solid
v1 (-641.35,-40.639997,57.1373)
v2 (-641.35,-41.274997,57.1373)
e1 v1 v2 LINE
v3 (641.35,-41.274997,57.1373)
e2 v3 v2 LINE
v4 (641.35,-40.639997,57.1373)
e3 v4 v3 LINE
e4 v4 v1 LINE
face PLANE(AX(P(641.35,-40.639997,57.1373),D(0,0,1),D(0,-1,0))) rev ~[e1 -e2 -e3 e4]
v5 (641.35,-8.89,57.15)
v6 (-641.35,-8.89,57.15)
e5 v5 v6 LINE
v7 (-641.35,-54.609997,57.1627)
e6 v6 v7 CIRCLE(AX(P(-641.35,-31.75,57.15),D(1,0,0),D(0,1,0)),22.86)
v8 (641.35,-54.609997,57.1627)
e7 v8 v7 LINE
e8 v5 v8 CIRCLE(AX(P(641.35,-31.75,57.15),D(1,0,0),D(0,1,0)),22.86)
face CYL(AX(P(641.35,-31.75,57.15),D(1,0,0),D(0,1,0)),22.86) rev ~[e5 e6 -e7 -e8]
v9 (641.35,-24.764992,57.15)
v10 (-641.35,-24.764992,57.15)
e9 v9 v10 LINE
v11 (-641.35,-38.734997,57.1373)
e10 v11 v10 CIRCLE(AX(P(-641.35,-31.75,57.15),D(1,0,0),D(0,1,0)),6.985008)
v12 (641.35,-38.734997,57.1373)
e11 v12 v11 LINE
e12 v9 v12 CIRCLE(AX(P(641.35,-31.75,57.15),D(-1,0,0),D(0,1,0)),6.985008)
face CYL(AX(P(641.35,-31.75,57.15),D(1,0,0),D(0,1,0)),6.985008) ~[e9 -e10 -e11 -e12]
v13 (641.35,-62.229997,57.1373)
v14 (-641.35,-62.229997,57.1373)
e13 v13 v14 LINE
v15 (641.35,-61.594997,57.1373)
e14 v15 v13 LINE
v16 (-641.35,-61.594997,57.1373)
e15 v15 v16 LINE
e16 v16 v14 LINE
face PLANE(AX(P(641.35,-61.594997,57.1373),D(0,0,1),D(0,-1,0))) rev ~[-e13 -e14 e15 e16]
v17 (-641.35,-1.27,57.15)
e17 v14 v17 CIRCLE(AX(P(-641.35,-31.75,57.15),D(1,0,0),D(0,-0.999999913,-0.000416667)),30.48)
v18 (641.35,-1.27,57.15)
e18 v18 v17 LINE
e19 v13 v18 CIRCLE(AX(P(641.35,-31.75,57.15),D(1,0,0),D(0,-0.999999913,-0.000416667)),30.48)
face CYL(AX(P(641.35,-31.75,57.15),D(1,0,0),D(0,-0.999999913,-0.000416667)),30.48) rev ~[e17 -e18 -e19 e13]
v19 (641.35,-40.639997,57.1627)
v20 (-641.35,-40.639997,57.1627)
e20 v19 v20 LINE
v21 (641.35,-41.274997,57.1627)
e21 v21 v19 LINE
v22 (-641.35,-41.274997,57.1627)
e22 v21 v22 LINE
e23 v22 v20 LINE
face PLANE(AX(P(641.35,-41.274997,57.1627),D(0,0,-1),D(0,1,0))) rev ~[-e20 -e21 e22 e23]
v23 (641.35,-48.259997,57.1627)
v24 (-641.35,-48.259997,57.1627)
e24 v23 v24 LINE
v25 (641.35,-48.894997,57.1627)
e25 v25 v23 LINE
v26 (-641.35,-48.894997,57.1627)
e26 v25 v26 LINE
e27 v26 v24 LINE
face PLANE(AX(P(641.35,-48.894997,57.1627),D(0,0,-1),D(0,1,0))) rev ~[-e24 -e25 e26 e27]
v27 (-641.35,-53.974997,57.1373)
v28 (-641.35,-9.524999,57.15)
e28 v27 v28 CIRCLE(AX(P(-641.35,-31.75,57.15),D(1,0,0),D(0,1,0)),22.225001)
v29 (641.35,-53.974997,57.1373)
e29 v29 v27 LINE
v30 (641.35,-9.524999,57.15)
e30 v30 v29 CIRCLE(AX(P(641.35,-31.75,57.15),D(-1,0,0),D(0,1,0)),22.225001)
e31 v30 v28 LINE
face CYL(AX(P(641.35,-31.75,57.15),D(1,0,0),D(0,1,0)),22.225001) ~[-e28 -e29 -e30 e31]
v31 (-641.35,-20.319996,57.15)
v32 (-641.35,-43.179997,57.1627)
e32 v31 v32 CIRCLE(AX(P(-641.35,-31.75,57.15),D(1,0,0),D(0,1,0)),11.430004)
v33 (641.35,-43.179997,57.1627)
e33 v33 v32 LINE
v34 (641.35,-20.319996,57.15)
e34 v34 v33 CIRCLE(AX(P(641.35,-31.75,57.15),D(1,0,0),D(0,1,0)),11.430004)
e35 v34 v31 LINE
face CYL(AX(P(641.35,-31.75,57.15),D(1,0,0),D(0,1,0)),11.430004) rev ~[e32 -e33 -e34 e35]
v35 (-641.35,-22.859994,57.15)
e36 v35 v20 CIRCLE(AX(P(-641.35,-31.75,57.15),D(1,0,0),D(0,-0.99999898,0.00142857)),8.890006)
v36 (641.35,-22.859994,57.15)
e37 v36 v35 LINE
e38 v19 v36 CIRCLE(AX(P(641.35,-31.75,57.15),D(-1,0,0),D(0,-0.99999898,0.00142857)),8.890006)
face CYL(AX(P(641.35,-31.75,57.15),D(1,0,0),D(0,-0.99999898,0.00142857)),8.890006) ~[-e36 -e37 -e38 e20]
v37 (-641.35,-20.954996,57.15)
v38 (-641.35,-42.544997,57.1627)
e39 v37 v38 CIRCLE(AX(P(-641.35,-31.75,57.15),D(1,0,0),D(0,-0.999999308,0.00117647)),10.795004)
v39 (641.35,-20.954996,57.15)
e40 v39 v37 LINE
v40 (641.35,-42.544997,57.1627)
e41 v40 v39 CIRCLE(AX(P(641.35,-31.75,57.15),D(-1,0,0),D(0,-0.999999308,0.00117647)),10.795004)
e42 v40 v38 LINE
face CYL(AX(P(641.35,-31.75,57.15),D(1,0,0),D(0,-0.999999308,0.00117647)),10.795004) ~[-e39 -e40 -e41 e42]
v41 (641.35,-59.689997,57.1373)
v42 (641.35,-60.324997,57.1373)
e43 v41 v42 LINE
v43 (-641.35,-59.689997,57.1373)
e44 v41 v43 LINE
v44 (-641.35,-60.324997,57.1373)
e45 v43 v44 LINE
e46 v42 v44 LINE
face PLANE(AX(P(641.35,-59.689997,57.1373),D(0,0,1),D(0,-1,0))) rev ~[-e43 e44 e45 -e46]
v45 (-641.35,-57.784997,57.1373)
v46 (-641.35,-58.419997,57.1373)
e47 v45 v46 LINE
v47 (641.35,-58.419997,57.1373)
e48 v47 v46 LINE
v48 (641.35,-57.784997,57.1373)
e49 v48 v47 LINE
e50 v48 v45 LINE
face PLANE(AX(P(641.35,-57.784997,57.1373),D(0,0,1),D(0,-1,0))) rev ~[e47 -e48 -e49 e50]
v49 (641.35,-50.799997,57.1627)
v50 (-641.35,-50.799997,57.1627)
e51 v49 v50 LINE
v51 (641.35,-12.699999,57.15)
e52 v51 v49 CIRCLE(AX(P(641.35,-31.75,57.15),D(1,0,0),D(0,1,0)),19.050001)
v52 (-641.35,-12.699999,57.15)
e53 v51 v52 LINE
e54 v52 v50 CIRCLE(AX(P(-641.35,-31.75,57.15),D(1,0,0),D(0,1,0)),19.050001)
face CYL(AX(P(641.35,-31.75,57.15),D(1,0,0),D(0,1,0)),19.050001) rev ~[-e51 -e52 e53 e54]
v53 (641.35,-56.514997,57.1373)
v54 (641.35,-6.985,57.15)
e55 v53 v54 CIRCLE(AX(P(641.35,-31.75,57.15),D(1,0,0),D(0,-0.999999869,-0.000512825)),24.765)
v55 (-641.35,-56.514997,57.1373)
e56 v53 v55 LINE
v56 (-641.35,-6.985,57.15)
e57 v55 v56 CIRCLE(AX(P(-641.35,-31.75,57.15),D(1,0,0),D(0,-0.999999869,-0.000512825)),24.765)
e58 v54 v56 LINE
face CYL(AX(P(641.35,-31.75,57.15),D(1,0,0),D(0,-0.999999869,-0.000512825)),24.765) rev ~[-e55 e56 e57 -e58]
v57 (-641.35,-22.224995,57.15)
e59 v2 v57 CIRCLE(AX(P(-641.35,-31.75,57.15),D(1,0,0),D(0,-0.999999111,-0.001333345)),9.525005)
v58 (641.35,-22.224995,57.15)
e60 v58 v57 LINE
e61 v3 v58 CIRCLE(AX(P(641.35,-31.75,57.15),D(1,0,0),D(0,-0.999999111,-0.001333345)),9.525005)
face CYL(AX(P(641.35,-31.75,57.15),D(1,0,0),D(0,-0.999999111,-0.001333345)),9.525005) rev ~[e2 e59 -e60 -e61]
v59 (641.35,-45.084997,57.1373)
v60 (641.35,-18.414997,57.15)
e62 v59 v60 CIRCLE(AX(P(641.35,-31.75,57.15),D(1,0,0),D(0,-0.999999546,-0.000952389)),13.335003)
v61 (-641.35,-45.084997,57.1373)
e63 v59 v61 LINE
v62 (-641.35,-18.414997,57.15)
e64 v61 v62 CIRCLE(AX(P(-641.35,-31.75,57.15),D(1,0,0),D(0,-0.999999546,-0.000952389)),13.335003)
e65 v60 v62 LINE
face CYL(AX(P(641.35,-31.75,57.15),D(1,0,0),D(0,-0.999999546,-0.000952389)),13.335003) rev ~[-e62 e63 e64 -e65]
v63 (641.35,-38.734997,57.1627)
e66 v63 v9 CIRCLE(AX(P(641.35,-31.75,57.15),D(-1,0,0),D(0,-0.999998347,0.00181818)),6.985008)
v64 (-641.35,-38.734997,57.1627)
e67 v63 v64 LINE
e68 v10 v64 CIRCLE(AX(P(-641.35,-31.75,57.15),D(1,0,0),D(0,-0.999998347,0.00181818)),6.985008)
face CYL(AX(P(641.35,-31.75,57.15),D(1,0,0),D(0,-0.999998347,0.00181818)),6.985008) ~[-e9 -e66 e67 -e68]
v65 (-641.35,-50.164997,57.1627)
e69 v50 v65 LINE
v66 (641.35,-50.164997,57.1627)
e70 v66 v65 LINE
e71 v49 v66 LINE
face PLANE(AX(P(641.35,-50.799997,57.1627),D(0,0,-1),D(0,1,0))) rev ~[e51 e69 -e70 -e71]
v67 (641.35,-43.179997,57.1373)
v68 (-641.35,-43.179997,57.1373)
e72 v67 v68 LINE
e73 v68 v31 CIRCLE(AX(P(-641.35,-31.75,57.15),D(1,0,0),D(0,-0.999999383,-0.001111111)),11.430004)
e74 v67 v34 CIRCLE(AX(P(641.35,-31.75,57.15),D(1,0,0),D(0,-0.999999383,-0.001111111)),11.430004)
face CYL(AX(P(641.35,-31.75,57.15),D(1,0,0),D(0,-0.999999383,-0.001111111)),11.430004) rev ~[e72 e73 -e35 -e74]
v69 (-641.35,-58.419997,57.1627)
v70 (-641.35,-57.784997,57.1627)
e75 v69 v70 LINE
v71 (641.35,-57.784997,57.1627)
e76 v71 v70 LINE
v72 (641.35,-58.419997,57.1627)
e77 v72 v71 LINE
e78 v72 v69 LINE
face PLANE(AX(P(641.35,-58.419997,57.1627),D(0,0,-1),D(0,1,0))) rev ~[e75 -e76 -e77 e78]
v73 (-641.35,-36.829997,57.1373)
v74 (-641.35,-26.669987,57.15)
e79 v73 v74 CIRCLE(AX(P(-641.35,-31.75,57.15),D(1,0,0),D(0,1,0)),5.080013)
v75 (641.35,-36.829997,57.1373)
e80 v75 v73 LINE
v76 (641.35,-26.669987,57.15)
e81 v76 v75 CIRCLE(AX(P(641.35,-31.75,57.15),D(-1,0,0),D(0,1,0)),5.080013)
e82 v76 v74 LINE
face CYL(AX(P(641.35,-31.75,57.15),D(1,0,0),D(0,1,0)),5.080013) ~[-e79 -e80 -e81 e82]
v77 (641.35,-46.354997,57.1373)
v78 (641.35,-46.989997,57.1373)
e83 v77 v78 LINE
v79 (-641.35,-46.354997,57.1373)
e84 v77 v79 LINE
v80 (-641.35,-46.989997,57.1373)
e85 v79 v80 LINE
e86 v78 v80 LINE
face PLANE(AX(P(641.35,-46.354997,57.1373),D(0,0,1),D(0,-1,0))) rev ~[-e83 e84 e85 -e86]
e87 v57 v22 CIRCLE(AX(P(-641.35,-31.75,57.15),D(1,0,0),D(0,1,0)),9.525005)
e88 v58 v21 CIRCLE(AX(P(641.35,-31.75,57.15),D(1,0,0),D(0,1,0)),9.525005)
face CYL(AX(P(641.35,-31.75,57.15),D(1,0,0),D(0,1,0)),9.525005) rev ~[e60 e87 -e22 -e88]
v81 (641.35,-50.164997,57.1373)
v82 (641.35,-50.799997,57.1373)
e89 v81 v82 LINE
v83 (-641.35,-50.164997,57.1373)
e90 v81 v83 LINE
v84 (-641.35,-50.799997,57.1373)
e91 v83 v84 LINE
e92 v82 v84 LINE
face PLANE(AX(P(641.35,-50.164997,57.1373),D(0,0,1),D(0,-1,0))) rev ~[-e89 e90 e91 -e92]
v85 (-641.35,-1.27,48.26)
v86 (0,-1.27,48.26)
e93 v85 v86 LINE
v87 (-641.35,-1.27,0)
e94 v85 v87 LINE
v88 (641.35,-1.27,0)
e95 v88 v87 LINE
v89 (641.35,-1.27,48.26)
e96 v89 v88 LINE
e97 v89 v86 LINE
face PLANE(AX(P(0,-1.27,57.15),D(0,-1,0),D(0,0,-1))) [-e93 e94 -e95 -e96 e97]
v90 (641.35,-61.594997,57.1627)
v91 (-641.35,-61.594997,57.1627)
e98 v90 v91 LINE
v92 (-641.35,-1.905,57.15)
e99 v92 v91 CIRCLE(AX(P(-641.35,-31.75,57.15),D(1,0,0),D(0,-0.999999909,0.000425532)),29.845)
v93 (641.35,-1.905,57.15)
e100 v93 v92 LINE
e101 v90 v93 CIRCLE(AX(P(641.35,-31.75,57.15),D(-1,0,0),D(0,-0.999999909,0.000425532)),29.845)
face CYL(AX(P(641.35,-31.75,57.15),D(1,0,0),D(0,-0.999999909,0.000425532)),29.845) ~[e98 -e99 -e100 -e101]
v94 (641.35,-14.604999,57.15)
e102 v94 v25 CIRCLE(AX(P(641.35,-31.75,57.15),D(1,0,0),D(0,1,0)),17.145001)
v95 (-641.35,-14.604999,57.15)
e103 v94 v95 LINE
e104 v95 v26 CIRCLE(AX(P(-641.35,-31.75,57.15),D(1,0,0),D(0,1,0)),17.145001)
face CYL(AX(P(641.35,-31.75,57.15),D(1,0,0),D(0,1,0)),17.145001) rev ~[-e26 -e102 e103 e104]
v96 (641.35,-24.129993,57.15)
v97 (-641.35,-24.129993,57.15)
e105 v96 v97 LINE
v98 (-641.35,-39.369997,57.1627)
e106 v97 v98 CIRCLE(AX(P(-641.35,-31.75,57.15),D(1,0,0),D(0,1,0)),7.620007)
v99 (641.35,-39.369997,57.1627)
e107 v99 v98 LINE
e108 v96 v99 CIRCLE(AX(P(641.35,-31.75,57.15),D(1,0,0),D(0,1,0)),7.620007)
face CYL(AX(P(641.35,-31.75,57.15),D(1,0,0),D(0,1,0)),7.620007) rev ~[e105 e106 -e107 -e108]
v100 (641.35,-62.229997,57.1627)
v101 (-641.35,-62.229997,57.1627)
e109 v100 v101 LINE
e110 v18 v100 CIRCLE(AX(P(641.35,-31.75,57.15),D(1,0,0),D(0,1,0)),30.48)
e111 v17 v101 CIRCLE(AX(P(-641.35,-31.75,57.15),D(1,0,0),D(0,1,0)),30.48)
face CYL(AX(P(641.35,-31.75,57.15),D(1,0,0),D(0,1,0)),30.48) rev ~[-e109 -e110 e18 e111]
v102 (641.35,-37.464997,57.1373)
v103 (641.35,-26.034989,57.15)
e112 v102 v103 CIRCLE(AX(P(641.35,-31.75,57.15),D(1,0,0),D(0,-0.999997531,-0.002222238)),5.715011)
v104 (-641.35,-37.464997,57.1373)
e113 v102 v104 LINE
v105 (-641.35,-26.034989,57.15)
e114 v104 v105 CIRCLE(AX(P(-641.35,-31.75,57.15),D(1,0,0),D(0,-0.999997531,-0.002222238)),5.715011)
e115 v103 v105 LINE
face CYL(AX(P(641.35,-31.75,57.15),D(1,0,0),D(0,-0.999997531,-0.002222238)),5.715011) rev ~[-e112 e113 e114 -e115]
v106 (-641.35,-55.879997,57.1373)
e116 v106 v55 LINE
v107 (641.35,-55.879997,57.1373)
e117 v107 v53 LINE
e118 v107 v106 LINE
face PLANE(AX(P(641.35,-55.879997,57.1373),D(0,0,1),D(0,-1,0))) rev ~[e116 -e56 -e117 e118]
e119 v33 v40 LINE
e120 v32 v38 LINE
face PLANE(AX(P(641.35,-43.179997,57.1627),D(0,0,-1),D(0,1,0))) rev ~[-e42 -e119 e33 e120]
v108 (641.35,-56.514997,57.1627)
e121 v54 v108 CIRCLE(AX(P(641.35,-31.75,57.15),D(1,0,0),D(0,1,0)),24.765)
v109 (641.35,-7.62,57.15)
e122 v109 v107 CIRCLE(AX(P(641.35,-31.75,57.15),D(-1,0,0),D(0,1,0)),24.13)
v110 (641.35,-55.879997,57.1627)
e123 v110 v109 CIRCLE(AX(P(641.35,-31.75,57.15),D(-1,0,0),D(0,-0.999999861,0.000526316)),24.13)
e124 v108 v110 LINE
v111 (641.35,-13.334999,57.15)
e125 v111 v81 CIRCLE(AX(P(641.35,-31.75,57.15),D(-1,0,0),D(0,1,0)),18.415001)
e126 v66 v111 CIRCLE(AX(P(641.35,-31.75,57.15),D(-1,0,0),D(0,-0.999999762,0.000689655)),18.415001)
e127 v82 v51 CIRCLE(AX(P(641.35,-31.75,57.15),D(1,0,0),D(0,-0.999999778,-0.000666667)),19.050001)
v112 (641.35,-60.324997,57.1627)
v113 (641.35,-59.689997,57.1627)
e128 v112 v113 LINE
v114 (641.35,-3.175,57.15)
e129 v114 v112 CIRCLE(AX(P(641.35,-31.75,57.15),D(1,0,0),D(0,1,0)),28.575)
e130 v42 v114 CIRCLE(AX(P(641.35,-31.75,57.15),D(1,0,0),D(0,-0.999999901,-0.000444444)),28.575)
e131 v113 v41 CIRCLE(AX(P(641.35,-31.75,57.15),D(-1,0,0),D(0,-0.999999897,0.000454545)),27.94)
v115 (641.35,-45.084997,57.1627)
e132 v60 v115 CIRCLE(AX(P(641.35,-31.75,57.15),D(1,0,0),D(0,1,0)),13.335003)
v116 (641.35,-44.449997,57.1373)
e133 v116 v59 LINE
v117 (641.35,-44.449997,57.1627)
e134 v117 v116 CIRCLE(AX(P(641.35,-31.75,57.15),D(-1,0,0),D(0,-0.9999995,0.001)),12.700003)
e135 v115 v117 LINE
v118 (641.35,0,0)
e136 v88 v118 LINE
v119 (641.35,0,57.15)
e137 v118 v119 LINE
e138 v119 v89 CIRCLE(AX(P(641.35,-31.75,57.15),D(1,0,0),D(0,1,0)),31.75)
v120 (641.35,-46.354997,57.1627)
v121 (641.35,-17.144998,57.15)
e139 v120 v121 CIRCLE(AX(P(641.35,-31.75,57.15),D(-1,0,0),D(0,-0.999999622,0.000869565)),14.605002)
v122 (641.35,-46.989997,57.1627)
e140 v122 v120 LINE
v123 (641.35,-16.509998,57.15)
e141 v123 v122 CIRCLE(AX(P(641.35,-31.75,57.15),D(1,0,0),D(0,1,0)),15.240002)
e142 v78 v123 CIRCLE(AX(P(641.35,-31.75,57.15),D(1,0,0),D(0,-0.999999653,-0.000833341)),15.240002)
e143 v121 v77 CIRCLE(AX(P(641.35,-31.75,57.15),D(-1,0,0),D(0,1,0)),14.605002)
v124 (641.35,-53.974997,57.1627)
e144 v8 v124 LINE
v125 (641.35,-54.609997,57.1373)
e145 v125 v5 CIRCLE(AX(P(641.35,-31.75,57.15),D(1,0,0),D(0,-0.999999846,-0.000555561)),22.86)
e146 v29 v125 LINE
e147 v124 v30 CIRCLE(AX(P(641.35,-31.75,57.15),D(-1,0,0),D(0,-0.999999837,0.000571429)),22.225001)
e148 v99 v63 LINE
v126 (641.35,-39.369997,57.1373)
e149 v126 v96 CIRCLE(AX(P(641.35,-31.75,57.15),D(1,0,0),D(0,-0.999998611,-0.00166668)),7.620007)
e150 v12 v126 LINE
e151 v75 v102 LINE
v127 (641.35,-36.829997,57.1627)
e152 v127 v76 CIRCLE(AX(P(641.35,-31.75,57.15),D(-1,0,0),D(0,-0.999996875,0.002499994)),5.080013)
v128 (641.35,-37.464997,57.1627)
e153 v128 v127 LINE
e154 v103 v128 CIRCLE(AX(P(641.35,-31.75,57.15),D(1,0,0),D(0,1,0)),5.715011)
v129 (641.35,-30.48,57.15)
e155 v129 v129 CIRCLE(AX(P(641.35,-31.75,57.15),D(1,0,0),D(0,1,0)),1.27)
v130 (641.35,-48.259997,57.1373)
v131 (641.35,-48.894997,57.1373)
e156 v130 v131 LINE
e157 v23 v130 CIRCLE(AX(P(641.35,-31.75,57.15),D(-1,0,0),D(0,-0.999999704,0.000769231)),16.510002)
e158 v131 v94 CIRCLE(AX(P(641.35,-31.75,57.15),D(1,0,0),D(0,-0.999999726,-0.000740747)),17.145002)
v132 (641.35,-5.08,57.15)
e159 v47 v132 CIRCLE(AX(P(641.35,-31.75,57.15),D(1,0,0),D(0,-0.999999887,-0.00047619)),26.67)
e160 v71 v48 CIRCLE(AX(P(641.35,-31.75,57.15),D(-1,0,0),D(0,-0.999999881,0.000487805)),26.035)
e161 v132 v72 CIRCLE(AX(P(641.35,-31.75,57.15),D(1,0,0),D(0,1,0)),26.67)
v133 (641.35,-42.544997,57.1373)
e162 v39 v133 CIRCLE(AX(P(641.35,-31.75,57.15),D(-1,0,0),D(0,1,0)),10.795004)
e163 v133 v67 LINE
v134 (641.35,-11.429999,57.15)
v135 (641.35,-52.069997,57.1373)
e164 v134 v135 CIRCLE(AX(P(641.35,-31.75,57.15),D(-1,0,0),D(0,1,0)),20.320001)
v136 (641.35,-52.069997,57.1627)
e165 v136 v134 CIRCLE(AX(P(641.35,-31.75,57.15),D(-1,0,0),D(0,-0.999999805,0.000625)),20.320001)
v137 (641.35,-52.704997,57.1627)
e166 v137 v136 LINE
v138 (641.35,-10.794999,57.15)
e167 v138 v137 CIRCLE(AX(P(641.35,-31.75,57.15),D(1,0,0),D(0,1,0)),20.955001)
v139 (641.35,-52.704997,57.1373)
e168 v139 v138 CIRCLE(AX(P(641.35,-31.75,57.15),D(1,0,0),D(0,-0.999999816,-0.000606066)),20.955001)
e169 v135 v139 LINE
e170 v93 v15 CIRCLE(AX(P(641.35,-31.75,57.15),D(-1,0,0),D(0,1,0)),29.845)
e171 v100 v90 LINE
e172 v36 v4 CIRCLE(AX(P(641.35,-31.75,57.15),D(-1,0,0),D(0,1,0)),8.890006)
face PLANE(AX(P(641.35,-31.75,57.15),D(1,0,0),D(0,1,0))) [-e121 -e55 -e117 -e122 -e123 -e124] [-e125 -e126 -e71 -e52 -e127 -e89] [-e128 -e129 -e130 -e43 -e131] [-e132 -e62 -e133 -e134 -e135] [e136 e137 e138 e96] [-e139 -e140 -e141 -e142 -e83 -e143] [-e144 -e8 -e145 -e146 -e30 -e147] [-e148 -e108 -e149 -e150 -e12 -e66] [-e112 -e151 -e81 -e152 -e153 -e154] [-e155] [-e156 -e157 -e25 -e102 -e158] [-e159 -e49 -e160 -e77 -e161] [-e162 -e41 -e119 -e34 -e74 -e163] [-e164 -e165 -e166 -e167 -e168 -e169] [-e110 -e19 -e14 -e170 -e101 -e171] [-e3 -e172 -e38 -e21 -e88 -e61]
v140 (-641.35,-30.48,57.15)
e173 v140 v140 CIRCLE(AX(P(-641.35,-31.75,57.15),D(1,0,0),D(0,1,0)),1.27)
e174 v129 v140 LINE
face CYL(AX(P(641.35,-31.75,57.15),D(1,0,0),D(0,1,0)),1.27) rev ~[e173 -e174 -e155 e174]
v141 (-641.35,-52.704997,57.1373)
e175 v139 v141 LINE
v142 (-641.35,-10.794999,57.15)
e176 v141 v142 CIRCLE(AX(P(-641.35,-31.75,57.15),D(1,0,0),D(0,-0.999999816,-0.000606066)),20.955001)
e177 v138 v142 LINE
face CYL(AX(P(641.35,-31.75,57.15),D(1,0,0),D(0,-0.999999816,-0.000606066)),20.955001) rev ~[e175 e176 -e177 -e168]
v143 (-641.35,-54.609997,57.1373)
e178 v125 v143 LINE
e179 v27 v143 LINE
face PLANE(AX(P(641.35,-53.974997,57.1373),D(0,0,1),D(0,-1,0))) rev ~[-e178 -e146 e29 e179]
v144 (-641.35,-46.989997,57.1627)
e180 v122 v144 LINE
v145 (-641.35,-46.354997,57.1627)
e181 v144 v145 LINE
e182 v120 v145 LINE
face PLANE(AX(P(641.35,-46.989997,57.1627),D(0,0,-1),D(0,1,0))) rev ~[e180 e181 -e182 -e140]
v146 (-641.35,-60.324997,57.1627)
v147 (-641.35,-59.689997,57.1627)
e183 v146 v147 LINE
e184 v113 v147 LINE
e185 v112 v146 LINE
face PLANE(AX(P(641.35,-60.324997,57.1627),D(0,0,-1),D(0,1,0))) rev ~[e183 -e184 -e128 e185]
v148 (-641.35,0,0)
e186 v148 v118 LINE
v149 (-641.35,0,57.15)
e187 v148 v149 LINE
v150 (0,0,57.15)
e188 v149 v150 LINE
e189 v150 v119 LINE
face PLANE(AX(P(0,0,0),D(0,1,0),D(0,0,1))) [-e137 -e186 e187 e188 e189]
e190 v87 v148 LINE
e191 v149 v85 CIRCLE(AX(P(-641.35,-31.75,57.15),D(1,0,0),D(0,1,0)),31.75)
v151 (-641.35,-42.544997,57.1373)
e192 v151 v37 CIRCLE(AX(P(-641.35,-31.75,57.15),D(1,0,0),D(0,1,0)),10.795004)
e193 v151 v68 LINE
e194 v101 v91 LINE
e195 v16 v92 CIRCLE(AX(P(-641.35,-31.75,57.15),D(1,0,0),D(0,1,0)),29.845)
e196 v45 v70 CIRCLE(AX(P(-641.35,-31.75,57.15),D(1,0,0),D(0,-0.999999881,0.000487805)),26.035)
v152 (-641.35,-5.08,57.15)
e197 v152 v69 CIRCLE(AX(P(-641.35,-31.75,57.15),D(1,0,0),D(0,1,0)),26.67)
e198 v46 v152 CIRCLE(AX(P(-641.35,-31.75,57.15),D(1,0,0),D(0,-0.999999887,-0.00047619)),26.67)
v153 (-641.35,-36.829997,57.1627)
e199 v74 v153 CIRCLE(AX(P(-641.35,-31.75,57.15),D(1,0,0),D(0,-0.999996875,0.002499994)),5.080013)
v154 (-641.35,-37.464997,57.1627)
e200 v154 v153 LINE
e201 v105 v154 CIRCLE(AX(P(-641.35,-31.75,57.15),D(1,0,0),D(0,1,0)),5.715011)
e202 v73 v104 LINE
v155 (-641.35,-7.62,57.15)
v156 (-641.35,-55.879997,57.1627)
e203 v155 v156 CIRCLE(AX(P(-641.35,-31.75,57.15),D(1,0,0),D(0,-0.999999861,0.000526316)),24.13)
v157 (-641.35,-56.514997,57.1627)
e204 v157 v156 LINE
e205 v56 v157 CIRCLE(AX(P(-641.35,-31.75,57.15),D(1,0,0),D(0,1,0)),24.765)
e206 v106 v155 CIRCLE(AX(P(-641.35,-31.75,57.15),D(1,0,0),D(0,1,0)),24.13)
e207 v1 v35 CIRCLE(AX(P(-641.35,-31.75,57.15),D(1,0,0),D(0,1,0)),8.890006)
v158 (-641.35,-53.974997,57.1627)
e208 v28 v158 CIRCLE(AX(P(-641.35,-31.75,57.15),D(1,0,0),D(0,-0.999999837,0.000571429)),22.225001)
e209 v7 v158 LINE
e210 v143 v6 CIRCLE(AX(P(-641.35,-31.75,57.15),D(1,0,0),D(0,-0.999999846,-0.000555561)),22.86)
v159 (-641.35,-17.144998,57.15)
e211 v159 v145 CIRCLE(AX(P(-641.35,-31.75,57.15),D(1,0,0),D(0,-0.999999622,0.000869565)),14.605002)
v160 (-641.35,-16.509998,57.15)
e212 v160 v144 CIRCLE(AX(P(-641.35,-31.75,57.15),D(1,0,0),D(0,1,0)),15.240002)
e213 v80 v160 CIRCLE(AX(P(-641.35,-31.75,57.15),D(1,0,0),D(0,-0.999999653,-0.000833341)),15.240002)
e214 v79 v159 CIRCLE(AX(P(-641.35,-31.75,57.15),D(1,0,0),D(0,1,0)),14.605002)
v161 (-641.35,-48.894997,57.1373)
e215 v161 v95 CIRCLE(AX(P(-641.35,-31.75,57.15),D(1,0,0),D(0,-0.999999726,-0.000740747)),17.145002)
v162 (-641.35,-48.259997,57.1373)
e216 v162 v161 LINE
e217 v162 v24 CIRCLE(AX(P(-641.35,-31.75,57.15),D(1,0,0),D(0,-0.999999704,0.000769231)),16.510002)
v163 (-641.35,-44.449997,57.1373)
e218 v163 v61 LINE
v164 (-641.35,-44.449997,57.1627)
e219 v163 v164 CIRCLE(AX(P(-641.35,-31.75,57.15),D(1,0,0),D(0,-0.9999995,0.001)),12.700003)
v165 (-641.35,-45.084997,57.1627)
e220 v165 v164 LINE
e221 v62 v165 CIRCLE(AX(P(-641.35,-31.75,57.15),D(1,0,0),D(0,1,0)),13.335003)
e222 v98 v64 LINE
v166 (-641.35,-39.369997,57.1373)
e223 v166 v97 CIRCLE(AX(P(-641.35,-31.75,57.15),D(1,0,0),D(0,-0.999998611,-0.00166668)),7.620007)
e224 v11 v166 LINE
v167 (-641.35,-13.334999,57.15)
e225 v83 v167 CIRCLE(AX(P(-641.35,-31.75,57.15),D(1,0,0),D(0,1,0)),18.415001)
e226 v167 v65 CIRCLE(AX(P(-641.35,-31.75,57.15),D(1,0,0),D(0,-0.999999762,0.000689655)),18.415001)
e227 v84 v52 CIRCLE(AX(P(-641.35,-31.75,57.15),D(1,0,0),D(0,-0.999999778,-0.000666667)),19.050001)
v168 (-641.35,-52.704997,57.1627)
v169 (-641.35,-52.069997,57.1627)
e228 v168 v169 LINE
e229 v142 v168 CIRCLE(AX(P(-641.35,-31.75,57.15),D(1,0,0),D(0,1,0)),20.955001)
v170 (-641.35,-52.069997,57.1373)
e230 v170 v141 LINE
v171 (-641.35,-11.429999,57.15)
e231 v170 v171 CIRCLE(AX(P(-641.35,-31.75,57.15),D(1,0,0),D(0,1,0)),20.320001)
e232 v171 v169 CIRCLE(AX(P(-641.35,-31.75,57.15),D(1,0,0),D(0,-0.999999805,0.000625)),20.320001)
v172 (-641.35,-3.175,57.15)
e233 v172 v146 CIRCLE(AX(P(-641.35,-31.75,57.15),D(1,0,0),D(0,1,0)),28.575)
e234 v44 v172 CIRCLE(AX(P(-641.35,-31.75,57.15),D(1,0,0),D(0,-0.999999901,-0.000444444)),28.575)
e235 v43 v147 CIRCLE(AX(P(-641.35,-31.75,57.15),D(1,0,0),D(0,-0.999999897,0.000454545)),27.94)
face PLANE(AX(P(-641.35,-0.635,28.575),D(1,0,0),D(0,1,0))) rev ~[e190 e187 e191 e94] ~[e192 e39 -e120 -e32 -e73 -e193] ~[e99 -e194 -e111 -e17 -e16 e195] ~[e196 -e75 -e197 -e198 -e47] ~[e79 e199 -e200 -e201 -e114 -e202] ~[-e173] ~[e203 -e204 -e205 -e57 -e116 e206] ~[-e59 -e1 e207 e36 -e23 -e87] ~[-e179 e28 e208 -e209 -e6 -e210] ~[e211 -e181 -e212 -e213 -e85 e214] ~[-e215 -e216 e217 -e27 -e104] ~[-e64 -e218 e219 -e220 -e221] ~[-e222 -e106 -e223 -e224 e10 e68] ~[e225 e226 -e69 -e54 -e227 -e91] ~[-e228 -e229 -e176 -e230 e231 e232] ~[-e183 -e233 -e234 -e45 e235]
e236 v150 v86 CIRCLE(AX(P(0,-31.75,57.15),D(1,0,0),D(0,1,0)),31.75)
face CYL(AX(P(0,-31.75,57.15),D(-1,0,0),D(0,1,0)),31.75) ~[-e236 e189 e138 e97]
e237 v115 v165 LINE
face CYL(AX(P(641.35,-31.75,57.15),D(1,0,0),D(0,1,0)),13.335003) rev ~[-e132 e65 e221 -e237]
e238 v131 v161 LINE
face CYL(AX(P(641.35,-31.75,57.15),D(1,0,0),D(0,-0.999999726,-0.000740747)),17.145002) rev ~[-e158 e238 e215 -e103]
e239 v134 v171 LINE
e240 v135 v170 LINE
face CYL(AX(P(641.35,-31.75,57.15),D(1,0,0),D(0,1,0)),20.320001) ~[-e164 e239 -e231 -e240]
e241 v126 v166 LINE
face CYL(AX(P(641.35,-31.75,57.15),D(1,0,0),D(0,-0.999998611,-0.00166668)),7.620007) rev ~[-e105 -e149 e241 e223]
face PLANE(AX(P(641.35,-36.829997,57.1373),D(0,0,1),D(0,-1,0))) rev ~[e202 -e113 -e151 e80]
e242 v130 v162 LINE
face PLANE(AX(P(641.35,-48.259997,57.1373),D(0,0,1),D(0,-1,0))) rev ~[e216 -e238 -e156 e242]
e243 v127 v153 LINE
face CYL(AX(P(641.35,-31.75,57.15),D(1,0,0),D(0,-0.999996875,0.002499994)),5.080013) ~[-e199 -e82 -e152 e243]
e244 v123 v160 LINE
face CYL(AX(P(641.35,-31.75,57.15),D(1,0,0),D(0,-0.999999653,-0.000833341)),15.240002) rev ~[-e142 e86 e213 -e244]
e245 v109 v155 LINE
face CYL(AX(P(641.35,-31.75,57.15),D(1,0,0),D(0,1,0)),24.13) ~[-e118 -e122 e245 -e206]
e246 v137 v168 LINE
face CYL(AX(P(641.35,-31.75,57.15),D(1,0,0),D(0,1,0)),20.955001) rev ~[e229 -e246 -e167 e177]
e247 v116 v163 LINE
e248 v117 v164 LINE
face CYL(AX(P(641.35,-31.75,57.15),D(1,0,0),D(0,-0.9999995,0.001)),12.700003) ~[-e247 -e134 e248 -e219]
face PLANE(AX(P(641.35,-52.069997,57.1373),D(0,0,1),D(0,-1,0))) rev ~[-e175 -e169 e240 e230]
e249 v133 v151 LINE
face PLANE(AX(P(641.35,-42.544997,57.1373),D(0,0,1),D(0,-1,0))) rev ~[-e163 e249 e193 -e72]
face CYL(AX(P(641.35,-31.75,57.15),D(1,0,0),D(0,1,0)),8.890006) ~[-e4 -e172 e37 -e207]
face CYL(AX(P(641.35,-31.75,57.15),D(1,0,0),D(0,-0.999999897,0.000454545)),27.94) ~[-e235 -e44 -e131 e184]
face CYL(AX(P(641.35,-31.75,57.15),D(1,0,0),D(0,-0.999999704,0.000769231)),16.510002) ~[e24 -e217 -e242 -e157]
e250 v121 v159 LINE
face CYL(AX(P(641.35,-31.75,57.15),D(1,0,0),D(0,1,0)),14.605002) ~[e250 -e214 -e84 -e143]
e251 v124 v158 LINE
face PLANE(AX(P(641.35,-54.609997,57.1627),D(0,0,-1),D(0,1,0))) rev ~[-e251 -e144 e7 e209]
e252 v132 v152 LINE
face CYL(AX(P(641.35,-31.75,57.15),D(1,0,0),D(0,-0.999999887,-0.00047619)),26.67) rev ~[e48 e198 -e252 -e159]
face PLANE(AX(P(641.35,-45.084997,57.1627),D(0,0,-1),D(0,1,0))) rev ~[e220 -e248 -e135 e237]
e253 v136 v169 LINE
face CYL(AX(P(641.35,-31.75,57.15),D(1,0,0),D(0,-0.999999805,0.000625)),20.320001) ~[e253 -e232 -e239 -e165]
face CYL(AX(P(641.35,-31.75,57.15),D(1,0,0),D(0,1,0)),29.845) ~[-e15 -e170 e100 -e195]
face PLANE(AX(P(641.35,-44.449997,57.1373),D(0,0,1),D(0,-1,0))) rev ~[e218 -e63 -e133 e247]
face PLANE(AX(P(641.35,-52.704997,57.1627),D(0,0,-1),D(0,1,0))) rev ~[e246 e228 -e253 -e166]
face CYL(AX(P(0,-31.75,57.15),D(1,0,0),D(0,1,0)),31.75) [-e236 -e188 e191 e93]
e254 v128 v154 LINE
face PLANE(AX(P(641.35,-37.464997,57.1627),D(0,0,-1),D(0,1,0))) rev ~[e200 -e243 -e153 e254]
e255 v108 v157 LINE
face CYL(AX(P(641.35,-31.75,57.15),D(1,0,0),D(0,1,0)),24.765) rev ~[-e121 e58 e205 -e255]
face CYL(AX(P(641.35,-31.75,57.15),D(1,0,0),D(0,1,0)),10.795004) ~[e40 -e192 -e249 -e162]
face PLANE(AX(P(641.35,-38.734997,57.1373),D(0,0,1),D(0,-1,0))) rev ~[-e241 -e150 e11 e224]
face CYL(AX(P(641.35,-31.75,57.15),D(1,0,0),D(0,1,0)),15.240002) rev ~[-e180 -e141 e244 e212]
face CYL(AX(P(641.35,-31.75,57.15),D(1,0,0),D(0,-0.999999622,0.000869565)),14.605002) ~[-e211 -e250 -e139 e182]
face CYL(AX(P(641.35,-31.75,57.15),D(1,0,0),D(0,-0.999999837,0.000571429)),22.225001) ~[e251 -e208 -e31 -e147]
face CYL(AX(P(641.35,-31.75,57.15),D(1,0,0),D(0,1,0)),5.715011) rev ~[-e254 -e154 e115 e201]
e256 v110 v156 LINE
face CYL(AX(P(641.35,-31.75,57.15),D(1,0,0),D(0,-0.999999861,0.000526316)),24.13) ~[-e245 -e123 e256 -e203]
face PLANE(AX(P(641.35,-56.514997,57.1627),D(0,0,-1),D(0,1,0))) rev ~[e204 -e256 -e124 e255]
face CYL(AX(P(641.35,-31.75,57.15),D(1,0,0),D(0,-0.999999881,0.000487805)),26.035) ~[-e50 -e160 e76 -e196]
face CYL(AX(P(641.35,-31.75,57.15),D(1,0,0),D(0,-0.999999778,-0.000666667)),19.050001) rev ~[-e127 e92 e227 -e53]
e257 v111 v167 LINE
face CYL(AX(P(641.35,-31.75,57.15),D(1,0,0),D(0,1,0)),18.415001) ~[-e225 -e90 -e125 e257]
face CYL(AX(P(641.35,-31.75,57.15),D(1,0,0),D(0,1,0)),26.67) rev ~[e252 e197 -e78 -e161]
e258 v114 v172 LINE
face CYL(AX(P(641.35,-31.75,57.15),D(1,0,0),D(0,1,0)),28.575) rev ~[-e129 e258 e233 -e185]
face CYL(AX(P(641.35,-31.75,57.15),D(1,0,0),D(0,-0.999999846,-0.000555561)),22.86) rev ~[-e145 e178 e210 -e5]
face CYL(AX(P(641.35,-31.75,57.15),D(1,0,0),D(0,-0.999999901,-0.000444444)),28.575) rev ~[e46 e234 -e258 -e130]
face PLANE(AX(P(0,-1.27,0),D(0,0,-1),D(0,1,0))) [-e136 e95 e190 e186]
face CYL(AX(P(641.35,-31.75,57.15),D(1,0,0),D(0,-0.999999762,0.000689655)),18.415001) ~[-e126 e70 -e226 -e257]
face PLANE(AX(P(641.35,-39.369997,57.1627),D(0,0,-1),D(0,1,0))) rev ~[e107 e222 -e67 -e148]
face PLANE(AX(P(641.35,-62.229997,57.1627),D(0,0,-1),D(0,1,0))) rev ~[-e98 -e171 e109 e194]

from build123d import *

# Parameters (mm, degrees)
F1_DEPTH      = 641.35
F2_R          = 31.75
F3_DEPTH      = 641.35
F3_DEPTH_BACK = 641.35
F4_R          = 1.27
F5_DEPTH      = 1282.701


# Not quite as in the source:
# - ends of sketch curves that miss each other by under 0.0002 mm in the source are joined


with BuildPart() as f1:
    # F0 (on Right) → F1 (new body, symmetric)
    with BuildSketch(Plane.YZ):
        Polygon((-1.27, 0), (0, 0), (0, 57.15), (-1.27, 57.15), (-1.27, 52.07), align=None)
    extrude(amount=F1_DEPTH, both=True)

    # F2 (on Right) → F3 (join, two sides)
    with BuildSketch(Plane.YZ) as f3_sk:
        with Locations((-31.75, 57.15)):
            Circle(F2_R)
    extrude(amount=F3_DEPTH)
    extrude(f3_sk.sketch, amount=-F3_DEPTH_BACK)

    # F4 (on face) → F5 (cut, through all)
    with BuildSketch(Plane.YZ.offset(641.35)):
        with BuildLine():
            ThreePointArc((-62.2299973542, 57.1373), (-31.7436499999, 26.6700006615), (-1.27, 57.15))
            ThreePointArc((-1.27, 57.15), (-31.7436499999, 87.6299993385), (-62.2299973542, 57.1627))
            Line((-62.2299973542, 57.1627), (-61.5949972979, 57.1627))
            ThreePointArc((-61.5949972979, 57.1627), (-31.7436499999, 86.9949993245), (-1.905, 57.15))
            ThreePointArc((-1.905, 57.15), (-31.7436499999, 27.3050006755), (-61.5949972979, 57.1373))
            Line((-61.5949972979, 57.1373), (-62.2299973542, 57.1373))
        make_face()
        with BuildLine():
            ThreePointArc((-3.175, 57.15), (-31.7436499998, 85.7249992944), (-60.3249971778, 57.1627))
            Line((-60.3249971778, 57.1627), (-59.6899971136, 57.1627))
            ThreePointArc((-59.6899971136, 57.1627), (-31.7436499998, 85.0899992784), (-3.81, 57.15))
            ThreePointArc((-3.81, 57.15), (-31.7436499998, 29.2100007216), (-59.6899971136, 57.1373))
            Line((-59.6899971136, 57.1373), (-60.3249971778, 57.1373))
            ThreePointArc((-60.3249971778, 57.1373), (-31.7436499998, 28.5750007056), (-3.175, 57.15))
        make_face()
        with BuildLine():
            ThreePointArc((-5.08, 57.15), (-31.7436499998, 83.819999244), (-58.4199969762, 57.1627))
            Line((-58.4199969762, 57.1627), (-57.7849969024, 57.1627))
            ThreePointArc((-57.7849969024, 57.1627), (-31.7436499998, 83.1849992256), (-5.715, 57.15))
            ThreePointArc((-5.715, 57.15), (-31.7436499998, 31.1150007744), (-57.7849969024, 57.1373))
            Line((-57.7849969024, 57.1373), (-58.4199969762, 57.1373))
            ThreePointArc((-58.4199969762, 57.1373), (-31.7436499998, 30.480000756), (-5.08, 57.15))
        make_face()
        with BuildLine():
            ThreePointArc((-6.985, 57.15), (-31.7436499998, 81.9149991859), (-56.5149967436, 57.1626999999))
            Line((-56.5149967436, 57.1626999999), (-55.8799969024, 57.1627))
            ThreePointArc((-55.8799969024, 57.1627), (-31.7436499998, 81.279999409), (-7.6199997555, 57.15))
            ThreePointArc((-7.6199997555, 57.15), (-31.7436499998, 33.020000591), (-55.8799969024, 57.1373))
            Line((-55.8799969024, 57.1373), (-56.5149969762, 57.1373))
            ThreePointArc((-56.5149969762, 57.1373), (-31.7436499998, 32.3850008141), (-6.985, 57.15))
        make_face()
        with BuildLine():
            ThreePointArc((-8.8899997286, 57.15), (-31.7436499998, 80.0099993894), (-54.6099967436, 57.1626999999))
            Line((-54.6099967436, 57.1626999999), (-53.9749969024, 57.1627))
            ThreePointArc((-53.9749969024, 57.1627), (-31.7436499997, 79.3749996239), (-9.524999469, 57.15))
            ThreePointArc((-9.524999469, 57.15), (-31.7436499997, 34.9250003761), (-53.9749969024, 57.1373))
            Line((-53.9749969024, 57.1373), (-54.6099969762, 57.1373))
            ThreePointArc((-54.6099969762, 57.1373), (-31.7436499998, 34.2900006106), (-8.8899997286, 57.15))
        make_face()
        with BuildLine():
            ThreePointArc((-10.7949994079, 57.15), (-31.7436499997, 78.10499963), (-52.7049967436, 57.1626999999))
            Line((-52.7049967436, 57.1626999999), (-52.0699969024, 57.1627))
            ThreePointArc((-52.0699969024, 57.1627), (-31.7436499997, 77.469999879), (-11.4299991288, 57.15))
            ThreePointArc((-11.4299991288, 57.15), (-31.7436499997, 36.830000121), (-52.0699969024, 57.1373))
            Line((-52.0699969024, 57.1373), (-52.7049969762, 57.1373))
            ThreePointArc((-52.7049969762, 57.1373), (-31.7436499997, 36.19500037), (-10.7949994079, 57.15))
        make_face()
        with BuildLine():
            ThreePointArc((-12.6999987905, 57.15), (-31.7436499996, 76.2000001512), (-50.7999969762, 57.1627000001))
            Line((-50.7999969762, 57.1627), (-50.1649969024, 57.1627))
            ThreePointArc((-50.1649969024, 57.1627), (-31.7436499996, 75.5650001869), (-13.3349987183, 57.15))
            ThreePointArc((-13.3349987183, 57.15), (-31.7436499996, 38.7349998131), (-50.1649969024, 57.1373))
            Line((-50.1649969024, 57.1373), (-50.7999969762, 57.1373))
            ThreePointArc((-50.7999969762, 57.1372999999), (-31.7436499996, 38.0999998488), (-12.6999987905, 57.15))
        make_face()
        with BuildLine():
            ThreePointArc((-14.6049985527, 57.15), (-31.7436499996, 74.2950002714), (-48.8949967436, 57.1626999999))
            Line((-48.8949967436, 57.1626999999), (-48.2599969024, 57.1627))
            ThreePointArc((-48.2599969024, 57.1627), (-31.7436499995, 73.6600005659), (-15.2399982129, 57.15))
            ThreePointArc((-15.2399982129, 57.15), (-31.7436499995, 40.6399994341), (-48.2599969024, 57.1373))
            Line((-48.2599969024, 57.1373), (-48.8949969762, 57.1373))
            ThreePointArc((-48.8949969762, 57.1373), (-31.7436499996, 40.0049997286), (-14.6049985527, 57.15))
        make_face()
        with BuildLine():
            ThreePointArc((-16.5099979647, 57.15), (-31.7436499995, 72.3900007123), (-46.9899967436, 57.1626999999))
            Line((-46.9899967436, 57.1626999999), (-46.3549969024, 57.1627))
            ThreePointArc((-46.3549969024, 57.1627), (-31.7436499994, 71.7550010437), (-17.1449975758, 57.15))
            ThreePointArc((-17.1449975758, 57.15), (-31.7436499994, 42.5449989563), (-46.3549969024, 57.1373))
            Line((-46.3549969024, 57.1373), (-46.9899969762, 57.1373))
            ThreePointArc((-46.9899969762, 57.1373), (-31.7436499995, 41.9099992877), (-16.5099979647, 57.15))
        make_face()
        with BuildLine():
            ThreePointArc((-18.4149972088, 57.15), (-31.7436499993, 70.4850012793), (-45.0849967436, 57.1626999999))
            Line((-45.0849967436, 57.1626999999), (-44.4499969024, 57.1627))
            ThreePointArc((-44.4499969024, 57.1627), (-31.7436499992, 69.8500016649), (-19.0499967476, 57.15))
            ThreePointArc((-19.0499967476, 57.15), (-31.7436499992, 44.4499983351), (-44.4499969024, 57.1373))
            Line((-44.4499969024, 57.1373), (-45.0849969762, 57.1373))
            ThreePointArc((-45.0849969762, 57.1373), (-31.7436499993, 43.8149987207), (-18.4149972088, 57.15))
        make_face()
        with BuildLine():
            ThreePointArc((-20.3199959683, 57.15), (-31.743649999, 68.5800022679), (-43.1799969762, 57.1627000001))
            Line((-43.1799969762, 57.1627), (-42.5449969024, 57.1627))
            ThreePointArc((-42.5449969024, 57.1627), (-31.7436499989, 67.9450025054), (-20.954995627, 57.15))
            ThreePointArc((-20.954995627, 57.15), (-31.7436499989, 46.3549974946), (-42.5449969024, 57.1373))
            Line((-42.5449969024, 57.1373), (-43.1799969762, 57.1373))
            ThreePointArc((-43.1799969762, 57.1372999999), (-31.743649999, 45.7199977321), (-20.3199959683, 57.15))
        make_face()
        with BuildLine():
            ThreePointArc((-22.2249947897, 57.15), (-31.7436499987, 66.6750030936), (-41.2749967436, 57.1626999998))
            Line((-41.2749967436, 57.1626999998), (-40.6399969024, 57.1627))
            ThreePointArc((-40.6399969024, 57.1627), (-31.7436499984, 66.040003706), (-22.8599940261, 57.15))
            ThreePointArc((-22.8599940261, 57.15), (-31.7436499984, 48.259996294), (-40.6399969024, 57.1373))
            Line((-40.6399969024, 57.1373), (-41.2749969762, 57.1373))
            ThreePointArc((-41.2749969762, 57.1373), (-31.7436499987, 47.6249969064), (-22.2249947897, 57.15))
        make_face()
        with BuildLine():
            ThreePointArc((-24.1299926731, 57.15), (-31.7436499979, 64.7700046811), (-39.3699967436, 57.1626999998))
            Line((-39.3699967436, 57.1626999998), (-38.7349969024, 57.1627))
            ThreePointArc((-38.7349969024, 57.1627), (-31.7436499974, 64.1350055615), (-24.7649915521, 57.15))
            ThreePointArc((-24.7649915521, 57.15), (-31.7436499974, 50.1649944385), (-38.7349969024, 57.1373))
            Line((-38.7349969024, 57.1373), (-39.3699969762, 57.1373))
            ThreePointArc((-39.3699969762, 57.1373), (-31.7436499979, 49.5299953189), (-24.1299926731, 57.15))
        make_face()
        with BuildLine():
            ThreePointArc((-26.0349891453, 57.15), (-31.7436499962, 62.8650073269), (-37.4649967436, 57.1626999997))
            Line((-37.4649967436, 57.1626999997), (-36.8299969024, 57.1627))
            ThreePointArc((-36.8299969024, 57.1627), (-31.743649995, 62.2300088087), (-26.6699872226, 57.15))
            ThreePointArc((-26.6699872226, 57.15), (-31.743649995, 52.0699911913), (-36.8299969024, 57.1373))
            Line((-36.8299969024, 57.1373), (-37.4649969762, 57.1373))
            ThreePointArc((-37.4649969762, 57.1373), (-31.7436499962, 51.4349926731), (-26.0349891453, 57.15))
        make_face()
        with Locations((-31.75, 57.15)):
            Circle(F4_R)
    extrude(amount=-F5_DEPTH, mode=Mode.SUBTRACT)


solid = f1.part
